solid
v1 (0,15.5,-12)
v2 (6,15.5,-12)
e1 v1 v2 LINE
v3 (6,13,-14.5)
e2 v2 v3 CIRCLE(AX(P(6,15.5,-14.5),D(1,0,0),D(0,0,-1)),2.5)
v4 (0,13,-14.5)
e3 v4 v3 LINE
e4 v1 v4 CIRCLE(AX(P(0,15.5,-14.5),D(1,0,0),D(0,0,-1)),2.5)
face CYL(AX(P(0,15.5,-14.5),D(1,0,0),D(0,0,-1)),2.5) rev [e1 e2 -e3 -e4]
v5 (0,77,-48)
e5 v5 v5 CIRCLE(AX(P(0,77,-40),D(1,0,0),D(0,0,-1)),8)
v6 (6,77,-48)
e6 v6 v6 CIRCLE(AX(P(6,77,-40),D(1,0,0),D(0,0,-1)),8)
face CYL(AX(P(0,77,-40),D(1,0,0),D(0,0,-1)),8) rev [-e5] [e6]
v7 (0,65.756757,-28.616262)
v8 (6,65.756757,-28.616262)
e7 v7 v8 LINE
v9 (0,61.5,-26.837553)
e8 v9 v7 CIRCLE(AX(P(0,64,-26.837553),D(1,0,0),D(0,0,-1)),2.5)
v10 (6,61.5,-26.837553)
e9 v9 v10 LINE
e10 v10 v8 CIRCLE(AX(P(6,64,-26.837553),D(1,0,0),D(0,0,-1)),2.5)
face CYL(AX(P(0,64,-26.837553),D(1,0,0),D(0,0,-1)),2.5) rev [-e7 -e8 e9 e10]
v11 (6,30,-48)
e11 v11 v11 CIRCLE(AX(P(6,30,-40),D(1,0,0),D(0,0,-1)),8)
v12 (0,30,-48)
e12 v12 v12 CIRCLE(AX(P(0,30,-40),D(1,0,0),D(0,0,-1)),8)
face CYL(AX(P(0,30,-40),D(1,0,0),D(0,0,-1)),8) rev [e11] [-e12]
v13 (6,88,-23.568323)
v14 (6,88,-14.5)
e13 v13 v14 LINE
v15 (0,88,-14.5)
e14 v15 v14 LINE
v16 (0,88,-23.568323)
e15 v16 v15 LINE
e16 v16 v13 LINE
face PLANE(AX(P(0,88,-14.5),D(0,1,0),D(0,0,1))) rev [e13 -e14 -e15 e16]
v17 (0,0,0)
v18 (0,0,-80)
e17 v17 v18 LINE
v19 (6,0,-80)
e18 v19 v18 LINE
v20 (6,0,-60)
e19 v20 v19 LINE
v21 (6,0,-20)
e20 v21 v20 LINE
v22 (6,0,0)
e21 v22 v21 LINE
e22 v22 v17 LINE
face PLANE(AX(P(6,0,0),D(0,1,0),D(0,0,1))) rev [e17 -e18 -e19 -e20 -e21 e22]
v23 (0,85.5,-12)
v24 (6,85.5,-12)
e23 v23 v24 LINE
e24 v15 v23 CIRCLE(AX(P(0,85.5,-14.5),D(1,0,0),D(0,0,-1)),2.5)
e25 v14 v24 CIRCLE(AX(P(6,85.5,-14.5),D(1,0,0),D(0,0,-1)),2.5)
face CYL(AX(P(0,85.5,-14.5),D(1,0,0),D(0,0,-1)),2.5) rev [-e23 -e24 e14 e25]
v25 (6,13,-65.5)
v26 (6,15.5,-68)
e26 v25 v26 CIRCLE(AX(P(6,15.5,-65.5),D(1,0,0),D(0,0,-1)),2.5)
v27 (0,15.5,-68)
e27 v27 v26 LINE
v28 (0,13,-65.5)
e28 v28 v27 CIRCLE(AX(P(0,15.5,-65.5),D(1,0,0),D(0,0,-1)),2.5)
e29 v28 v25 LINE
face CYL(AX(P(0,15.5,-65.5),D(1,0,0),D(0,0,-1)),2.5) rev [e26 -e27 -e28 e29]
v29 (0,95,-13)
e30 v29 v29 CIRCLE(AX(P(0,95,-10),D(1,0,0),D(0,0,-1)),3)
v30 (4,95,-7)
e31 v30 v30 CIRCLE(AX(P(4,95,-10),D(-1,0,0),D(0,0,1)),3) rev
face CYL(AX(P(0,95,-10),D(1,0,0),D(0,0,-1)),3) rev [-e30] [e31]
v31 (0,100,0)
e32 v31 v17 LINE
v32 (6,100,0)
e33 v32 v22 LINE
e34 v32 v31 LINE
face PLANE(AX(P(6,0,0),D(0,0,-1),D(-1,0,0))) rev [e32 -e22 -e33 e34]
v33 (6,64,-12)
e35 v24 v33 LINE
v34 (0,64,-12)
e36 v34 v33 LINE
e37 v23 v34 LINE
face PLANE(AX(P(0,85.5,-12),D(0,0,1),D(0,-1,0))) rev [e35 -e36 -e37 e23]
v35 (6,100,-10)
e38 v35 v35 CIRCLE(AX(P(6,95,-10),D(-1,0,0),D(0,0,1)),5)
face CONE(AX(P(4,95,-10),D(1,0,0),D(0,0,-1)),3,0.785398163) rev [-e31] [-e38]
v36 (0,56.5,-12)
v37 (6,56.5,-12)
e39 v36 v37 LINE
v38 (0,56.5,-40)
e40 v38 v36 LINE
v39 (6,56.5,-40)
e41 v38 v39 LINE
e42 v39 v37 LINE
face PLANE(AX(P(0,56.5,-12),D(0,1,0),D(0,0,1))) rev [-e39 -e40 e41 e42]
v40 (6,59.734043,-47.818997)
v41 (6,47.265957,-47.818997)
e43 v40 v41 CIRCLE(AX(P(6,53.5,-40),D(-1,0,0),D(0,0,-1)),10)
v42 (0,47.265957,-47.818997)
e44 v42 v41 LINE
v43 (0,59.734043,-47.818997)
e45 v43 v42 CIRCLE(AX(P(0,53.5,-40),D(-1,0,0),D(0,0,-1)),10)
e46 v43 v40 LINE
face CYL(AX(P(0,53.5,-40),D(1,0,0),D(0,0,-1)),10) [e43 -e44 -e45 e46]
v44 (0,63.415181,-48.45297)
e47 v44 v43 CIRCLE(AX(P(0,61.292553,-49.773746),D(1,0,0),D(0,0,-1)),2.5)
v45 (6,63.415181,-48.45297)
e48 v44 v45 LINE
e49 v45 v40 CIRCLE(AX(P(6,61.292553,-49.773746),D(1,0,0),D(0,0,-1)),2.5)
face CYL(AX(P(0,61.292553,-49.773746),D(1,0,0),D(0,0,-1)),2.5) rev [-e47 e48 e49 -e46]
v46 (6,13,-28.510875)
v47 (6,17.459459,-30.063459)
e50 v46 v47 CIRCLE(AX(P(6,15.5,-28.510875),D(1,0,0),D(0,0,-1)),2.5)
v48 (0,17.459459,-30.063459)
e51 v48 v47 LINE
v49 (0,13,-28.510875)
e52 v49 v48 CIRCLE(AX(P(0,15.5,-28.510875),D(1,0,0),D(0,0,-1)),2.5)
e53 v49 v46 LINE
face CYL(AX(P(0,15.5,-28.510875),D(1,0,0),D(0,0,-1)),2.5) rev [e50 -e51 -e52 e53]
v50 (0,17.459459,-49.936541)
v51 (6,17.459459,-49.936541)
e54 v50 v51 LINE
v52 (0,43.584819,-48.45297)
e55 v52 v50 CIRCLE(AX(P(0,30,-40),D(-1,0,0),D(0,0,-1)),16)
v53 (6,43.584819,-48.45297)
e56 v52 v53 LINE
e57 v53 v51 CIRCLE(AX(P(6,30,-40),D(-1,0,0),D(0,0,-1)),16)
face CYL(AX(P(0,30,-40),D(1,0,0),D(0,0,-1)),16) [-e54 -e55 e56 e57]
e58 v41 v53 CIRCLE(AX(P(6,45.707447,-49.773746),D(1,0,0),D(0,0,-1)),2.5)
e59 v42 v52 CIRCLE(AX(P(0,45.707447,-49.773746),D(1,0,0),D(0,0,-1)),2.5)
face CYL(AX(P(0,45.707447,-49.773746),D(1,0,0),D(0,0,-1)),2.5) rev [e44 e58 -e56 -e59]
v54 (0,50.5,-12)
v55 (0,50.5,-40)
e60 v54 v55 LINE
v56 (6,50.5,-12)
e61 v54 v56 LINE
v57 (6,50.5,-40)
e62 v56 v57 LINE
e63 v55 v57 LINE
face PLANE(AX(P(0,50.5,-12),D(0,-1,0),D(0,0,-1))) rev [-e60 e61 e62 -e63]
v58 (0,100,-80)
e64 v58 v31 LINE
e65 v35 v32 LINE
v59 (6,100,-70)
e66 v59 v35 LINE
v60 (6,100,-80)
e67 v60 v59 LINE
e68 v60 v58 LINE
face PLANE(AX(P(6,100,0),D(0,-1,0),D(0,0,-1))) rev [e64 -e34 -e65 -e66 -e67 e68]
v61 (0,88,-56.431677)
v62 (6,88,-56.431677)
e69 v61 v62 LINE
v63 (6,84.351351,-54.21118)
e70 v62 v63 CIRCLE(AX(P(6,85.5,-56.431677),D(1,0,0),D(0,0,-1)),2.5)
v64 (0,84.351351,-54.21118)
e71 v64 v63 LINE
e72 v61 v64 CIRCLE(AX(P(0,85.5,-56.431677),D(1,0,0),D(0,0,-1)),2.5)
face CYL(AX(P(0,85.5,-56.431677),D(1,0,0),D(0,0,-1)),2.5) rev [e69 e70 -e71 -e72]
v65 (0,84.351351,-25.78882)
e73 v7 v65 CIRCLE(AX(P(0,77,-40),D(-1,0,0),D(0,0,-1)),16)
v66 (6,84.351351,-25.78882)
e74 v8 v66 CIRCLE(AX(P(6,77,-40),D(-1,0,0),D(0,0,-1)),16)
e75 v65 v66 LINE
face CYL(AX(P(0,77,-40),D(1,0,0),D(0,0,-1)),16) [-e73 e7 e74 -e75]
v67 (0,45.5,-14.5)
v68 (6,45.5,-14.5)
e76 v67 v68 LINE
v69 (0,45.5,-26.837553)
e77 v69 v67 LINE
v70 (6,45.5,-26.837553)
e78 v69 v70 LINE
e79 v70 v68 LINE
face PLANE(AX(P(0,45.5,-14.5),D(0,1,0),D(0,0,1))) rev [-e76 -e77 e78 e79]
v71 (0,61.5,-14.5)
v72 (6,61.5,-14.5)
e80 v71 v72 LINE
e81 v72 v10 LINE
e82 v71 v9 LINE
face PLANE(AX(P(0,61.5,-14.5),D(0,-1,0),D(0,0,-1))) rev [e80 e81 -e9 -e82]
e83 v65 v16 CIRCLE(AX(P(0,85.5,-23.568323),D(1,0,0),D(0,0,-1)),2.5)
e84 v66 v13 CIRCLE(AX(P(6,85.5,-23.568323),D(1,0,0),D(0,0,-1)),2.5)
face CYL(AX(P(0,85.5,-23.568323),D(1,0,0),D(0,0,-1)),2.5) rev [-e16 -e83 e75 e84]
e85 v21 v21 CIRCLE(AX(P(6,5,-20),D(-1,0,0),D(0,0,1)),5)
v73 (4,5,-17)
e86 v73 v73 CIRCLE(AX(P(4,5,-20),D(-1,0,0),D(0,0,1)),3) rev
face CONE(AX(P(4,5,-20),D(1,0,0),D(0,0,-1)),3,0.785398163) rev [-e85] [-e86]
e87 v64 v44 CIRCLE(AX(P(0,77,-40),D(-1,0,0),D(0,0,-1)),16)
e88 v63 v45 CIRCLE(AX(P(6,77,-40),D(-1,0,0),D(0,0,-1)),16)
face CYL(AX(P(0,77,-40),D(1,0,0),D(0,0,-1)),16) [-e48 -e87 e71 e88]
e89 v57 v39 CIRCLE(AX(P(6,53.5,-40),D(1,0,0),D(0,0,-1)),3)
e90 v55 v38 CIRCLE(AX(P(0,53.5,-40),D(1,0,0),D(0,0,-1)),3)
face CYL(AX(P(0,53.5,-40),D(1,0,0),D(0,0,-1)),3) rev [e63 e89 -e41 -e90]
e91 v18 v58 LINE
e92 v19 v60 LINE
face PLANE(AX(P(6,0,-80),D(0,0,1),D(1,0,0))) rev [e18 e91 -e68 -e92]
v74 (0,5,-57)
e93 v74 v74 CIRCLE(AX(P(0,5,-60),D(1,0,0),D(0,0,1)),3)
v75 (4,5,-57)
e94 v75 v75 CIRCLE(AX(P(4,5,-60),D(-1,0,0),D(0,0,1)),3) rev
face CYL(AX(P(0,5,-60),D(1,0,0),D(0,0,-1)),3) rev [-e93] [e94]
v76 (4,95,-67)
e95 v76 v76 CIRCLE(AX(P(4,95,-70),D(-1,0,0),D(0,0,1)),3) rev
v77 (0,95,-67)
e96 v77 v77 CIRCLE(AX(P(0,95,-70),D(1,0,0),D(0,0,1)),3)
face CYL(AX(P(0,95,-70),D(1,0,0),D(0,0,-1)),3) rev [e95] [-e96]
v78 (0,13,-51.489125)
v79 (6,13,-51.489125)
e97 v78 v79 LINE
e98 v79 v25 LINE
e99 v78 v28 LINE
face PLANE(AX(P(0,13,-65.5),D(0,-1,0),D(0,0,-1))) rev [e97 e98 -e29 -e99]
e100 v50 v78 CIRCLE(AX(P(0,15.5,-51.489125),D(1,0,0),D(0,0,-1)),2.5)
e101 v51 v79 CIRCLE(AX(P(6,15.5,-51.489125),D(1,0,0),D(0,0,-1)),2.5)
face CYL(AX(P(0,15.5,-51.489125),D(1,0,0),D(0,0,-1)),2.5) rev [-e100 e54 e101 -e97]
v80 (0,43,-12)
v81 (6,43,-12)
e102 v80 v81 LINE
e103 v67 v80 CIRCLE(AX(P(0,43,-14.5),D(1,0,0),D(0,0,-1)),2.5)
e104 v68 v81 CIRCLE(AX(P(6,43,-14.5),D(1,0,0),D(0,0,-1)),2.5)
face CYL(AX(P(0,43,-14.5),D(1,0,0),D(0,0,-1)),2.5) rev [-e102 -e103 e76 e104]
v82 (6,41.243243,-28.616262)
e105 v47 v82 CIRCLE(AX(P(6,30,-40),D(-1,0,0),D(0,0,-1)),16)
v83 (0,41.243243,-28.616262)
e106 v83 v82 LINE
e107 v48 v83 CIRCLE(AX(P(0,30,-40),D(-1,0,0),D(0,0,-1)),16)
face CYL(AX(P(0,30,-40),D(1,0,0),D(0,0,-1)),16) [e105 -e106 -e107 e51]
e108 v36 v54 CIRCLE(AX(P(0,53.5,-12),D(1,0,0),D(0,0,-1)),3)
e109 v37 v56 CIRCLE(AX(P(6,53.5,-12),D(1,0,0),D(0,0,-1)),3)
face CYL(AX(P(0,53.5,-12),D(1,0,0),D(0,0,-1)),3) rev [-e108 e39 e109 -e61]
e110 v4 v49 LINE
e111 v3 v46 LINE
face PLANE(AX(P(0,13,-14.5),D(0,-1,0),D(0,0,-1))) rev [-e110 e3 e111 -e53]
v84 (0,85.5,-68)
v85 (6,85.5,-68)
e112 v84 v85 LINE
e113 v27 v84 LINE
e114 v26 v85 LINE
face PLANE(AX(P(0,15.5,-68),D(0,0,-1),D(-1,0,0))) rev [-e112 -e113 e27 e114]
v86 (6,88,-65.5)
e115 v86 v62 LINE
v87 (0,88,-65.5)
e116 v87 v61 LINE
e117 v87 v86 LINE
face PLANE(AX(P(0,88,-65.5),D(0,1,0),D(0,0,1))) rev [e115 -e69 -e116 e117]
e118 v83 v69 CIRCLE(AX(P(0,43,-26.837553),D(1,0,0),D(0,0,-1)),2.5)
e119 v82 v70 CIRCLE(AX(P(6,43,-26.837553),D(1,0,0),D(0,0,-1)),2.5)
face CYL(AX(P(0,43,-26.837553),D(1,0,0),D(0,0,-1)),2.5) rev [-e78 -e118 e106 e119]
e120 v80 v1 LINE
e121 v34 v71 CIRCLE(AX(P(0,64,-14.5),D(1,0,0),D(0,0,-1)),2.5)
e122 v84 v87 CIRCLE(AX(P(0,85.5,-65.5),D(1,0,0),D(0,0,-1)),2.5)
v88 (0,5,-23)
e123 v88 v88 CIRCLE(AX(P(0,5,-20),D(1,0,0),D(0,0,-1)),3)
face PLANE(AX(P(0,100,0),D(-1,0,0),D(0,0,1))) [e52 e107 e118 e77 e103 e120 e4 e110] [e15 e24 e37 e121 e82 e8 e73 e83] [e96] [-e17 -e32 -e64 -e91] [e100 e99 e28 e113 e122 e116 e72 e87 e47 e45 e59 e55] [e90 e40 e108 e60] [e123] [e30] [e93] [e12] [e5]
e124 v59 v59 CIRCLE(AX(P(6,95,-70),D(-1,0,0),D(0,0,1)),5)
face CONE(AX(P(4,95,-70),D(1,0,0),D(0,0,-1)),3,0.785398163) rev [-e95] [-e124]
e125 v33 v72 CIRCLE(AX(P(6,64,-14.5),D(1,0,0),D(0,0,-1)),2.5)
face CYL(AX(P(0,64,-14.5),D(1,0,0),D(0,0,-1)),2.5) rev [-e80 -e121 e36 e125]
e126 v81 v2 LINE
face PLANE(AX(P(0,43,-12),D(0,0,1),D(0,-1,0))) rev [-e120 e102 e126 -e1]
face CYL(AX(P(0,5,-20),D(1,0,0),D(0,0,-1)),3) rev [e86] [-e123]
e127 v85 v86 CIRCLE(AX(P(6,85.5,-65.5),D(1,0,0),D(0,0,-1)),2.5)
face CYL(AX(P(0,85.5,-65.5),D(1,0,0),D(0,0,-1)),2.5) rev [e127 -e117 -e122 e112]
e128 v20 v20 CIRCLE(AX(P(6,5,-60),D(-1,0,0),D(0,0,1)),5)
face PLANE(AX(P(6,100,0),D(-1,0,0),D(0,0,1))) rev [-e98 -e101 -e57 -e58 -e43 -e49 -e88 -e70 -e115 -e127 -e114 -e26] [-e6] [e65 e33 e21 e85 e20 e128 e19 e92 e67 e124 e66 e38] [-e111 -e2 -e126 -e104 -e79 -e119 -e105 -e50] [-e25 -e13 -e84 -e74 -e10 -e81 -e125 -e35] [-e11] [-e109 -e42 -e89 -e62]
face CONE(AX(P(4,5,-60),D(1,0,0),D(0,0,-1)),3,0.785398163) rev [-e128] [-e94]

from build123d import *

# Parameters (mm, degrees)
ESQUISSE1_W      = 80
ESQUISSE1_H      = 100
EXTRUSION1_DEPTH = 6
ESQUISSE2_R      = 8
EXTRUSION3_DEPTH = 129.202964084
ESQUISSE3_R      = 3
EXTRUSION4_DEPTH = 129.202964084
EXTRUSION5_DEPTH = 129.202964084
CHANFREIN1_SIZE  = 2


with BuildPart() as part:
    # Esquisse1 → Extrusion1 (new body)
    with BuildSketch(Plane(origin=(0, 0, 0), x_dir=(0, 0, -1), z_dir=(1, 0, 0))):
        with Locations((40, 50)):
            Rectangle(ESQUISSE1_W, ESQUISSE1_H)
    extrude(amount=EXTRUSION1_DEPTH)

    # Esquisse2 → Extrusion3 (cut, through all)
    with BuildSketch(Plane(origin=(6, 0, 0), x_dir=(0, 0, -1), z_dir=(1, 0, 0))):
        with Locations((40, 77)):
            Circle(ESQUISSE2_R)
        with Locations((40, 30)):
            Circle(ESQUISSE2_R)
    extrude(amount=-EXTRUSION3_DEPTH, mode=Mode.SUBTRACT)

    # Esquisse3 → Extrusion4 (cut, through all)
    with BuildSketch(Plane(origin=(6, 0, 0), x_dir=(0, 0, -1), z_dir=(1, 0, 0))):
        with Locations((10, 95)):
            Circle(ESQUISSE3_R)
        with Locations(Location((70, 95, 0), (0, 0, 180))):
            Circle(ESQUISSE3_R)
        with Locations((20, 5)):
            Circle(ESQUISSE3_R)
        with Locations(Location((60, 5, 0), (0, 0, 180))):
            Circle(ESQUISSE3_R)
    extrude(amount=-EXTRUSION4_DEPTH, mode=Mode.SUBTRACT)

    # Esquisse4 → Extrusion5 (cut, through all)
    with BuildSketch(Plane(origin=(6, 0, 0), x_dir=(0, 0, -1), z_dir=(1, 0, 0))):
        with BuildLine():
            Line((14.5, 88), (23.568323275, 88))
            ThreePointArc((23.568323275, 88), (25.703928765, 86.799688112), (25.78882013, 84.351351351))
            ThreePointArc((25.78882013, 84.351351351), (24.18182416, 74.59473222), (28.616262416, 65.756756757))
            ThreePointArc((28.616262416, 65.756756757), (29.144270989, 63.036125499), (26.837553419, 61.5))
            Line((26.837553419, 61.5), (14.5, 61.5))
            ThreePointArc((14.5, 61.5), (12.732233047, 62.232233047), (12, 64))
            Line((12, 64), (12, 85.5))
            ThreePointArc((12, 85.5), (12.732233047, 87.267766953), (14.5, 88))
        make_face()
        with BuildLine():
            Line((12, 56.5), (40, 56.5))
            ThreePointArc((40, 56.5), (43, 53.5), (40, 50.5))
            Line((40, 50.5), (12, 50.5))
            ThreePointArc((12, 50.5), (9, 53.5), (12, 56.5))
        make_face()
        with BuildLine():
            Line((14.5, 45.5), (26.837553419, 45.5))
            ThreePointArc((26.837553419, 45.5), (29.144270989, 43.963874501), (28.616262416, 41.243243243))
            ThreePointArc((28.616262416, 41.243243243), (24.029537881, 29.028228573), (30.063459206, 17.459459459))
            ThreePointArc((30.063459206, 17.459459459), (30.871875411, 14.678005063), (28.510874707, 13))
            Line((28.510874707, 13), (14.5, 13))
            ThreePointArc((14.5, 13), (12.732233047, 13.732233047), (12, 15.5))
            Line((12, 15.5), (12, 43))
            ThreePointArc((12, 43), (12.732233047, 44.767766953), (14.5, 45.5))
        make_face()
        with BuildLine():
            Line((65.5, 13), (51.489125293, 13))
            ThreePointArc((51.489125293, 13), (49.128124589, 14.678005063), (49.936540794, 17.459459459))
            ThreePointArc((49.936540794, 17.459459459), (55.974264455, 30.907124639), (48.452969685, 43.584818861))
            ThreePointArc((48.452969685, 43.584818861), (47.310016798, 45.28313862), (47.818996959, 47.265957447))
            ThreePointArc((47.818996959, 47.265957447), (50, 53.5), (47.818996959, 59.734042553))
            ThreePointArc((47.818996959, 59.734042553), (47.310016798, 61.71686138), (48.452969685, 63.415181139))
            ThreePointArc((48.452969685, 63.415181139), (55.427142463, 72.756973317), (54.21117987, 84.351351351))
            ThreePointArc((54.21117987, 84.351351351), (54.296071235, 86.799688112), (56.431676725, 88))
            Line((56.431676725, 88), (65.5, 88))
            ThreePointArc((65.5, 88), (67.267766953, 87.267766953), (68, 85.5))
            Line((68, 85.5), (68, 15.5))
            ThreePointArc((68, 15.5), (67.267766953, 13.732233047), (65.5, 13))
        make_face()
    extrude(amount=-EXTRUSION5_DEPTH, mode=Mode.SUBTRACT)

    # Chanfrein1
    chanfrein1_edges = [part.edges().sort_by_distance(p)[0] for p in [
        (6, 95, -7),
        (6, 95, -73),
        (6, 5, -17),
        (6, 5, -63),
    ]]
    chamfer(chanfrein1_edges, length=CHANFREIN1_SIZE - 0.0001)  # a hair under: the kernel refuses the full size


solid = part.part
